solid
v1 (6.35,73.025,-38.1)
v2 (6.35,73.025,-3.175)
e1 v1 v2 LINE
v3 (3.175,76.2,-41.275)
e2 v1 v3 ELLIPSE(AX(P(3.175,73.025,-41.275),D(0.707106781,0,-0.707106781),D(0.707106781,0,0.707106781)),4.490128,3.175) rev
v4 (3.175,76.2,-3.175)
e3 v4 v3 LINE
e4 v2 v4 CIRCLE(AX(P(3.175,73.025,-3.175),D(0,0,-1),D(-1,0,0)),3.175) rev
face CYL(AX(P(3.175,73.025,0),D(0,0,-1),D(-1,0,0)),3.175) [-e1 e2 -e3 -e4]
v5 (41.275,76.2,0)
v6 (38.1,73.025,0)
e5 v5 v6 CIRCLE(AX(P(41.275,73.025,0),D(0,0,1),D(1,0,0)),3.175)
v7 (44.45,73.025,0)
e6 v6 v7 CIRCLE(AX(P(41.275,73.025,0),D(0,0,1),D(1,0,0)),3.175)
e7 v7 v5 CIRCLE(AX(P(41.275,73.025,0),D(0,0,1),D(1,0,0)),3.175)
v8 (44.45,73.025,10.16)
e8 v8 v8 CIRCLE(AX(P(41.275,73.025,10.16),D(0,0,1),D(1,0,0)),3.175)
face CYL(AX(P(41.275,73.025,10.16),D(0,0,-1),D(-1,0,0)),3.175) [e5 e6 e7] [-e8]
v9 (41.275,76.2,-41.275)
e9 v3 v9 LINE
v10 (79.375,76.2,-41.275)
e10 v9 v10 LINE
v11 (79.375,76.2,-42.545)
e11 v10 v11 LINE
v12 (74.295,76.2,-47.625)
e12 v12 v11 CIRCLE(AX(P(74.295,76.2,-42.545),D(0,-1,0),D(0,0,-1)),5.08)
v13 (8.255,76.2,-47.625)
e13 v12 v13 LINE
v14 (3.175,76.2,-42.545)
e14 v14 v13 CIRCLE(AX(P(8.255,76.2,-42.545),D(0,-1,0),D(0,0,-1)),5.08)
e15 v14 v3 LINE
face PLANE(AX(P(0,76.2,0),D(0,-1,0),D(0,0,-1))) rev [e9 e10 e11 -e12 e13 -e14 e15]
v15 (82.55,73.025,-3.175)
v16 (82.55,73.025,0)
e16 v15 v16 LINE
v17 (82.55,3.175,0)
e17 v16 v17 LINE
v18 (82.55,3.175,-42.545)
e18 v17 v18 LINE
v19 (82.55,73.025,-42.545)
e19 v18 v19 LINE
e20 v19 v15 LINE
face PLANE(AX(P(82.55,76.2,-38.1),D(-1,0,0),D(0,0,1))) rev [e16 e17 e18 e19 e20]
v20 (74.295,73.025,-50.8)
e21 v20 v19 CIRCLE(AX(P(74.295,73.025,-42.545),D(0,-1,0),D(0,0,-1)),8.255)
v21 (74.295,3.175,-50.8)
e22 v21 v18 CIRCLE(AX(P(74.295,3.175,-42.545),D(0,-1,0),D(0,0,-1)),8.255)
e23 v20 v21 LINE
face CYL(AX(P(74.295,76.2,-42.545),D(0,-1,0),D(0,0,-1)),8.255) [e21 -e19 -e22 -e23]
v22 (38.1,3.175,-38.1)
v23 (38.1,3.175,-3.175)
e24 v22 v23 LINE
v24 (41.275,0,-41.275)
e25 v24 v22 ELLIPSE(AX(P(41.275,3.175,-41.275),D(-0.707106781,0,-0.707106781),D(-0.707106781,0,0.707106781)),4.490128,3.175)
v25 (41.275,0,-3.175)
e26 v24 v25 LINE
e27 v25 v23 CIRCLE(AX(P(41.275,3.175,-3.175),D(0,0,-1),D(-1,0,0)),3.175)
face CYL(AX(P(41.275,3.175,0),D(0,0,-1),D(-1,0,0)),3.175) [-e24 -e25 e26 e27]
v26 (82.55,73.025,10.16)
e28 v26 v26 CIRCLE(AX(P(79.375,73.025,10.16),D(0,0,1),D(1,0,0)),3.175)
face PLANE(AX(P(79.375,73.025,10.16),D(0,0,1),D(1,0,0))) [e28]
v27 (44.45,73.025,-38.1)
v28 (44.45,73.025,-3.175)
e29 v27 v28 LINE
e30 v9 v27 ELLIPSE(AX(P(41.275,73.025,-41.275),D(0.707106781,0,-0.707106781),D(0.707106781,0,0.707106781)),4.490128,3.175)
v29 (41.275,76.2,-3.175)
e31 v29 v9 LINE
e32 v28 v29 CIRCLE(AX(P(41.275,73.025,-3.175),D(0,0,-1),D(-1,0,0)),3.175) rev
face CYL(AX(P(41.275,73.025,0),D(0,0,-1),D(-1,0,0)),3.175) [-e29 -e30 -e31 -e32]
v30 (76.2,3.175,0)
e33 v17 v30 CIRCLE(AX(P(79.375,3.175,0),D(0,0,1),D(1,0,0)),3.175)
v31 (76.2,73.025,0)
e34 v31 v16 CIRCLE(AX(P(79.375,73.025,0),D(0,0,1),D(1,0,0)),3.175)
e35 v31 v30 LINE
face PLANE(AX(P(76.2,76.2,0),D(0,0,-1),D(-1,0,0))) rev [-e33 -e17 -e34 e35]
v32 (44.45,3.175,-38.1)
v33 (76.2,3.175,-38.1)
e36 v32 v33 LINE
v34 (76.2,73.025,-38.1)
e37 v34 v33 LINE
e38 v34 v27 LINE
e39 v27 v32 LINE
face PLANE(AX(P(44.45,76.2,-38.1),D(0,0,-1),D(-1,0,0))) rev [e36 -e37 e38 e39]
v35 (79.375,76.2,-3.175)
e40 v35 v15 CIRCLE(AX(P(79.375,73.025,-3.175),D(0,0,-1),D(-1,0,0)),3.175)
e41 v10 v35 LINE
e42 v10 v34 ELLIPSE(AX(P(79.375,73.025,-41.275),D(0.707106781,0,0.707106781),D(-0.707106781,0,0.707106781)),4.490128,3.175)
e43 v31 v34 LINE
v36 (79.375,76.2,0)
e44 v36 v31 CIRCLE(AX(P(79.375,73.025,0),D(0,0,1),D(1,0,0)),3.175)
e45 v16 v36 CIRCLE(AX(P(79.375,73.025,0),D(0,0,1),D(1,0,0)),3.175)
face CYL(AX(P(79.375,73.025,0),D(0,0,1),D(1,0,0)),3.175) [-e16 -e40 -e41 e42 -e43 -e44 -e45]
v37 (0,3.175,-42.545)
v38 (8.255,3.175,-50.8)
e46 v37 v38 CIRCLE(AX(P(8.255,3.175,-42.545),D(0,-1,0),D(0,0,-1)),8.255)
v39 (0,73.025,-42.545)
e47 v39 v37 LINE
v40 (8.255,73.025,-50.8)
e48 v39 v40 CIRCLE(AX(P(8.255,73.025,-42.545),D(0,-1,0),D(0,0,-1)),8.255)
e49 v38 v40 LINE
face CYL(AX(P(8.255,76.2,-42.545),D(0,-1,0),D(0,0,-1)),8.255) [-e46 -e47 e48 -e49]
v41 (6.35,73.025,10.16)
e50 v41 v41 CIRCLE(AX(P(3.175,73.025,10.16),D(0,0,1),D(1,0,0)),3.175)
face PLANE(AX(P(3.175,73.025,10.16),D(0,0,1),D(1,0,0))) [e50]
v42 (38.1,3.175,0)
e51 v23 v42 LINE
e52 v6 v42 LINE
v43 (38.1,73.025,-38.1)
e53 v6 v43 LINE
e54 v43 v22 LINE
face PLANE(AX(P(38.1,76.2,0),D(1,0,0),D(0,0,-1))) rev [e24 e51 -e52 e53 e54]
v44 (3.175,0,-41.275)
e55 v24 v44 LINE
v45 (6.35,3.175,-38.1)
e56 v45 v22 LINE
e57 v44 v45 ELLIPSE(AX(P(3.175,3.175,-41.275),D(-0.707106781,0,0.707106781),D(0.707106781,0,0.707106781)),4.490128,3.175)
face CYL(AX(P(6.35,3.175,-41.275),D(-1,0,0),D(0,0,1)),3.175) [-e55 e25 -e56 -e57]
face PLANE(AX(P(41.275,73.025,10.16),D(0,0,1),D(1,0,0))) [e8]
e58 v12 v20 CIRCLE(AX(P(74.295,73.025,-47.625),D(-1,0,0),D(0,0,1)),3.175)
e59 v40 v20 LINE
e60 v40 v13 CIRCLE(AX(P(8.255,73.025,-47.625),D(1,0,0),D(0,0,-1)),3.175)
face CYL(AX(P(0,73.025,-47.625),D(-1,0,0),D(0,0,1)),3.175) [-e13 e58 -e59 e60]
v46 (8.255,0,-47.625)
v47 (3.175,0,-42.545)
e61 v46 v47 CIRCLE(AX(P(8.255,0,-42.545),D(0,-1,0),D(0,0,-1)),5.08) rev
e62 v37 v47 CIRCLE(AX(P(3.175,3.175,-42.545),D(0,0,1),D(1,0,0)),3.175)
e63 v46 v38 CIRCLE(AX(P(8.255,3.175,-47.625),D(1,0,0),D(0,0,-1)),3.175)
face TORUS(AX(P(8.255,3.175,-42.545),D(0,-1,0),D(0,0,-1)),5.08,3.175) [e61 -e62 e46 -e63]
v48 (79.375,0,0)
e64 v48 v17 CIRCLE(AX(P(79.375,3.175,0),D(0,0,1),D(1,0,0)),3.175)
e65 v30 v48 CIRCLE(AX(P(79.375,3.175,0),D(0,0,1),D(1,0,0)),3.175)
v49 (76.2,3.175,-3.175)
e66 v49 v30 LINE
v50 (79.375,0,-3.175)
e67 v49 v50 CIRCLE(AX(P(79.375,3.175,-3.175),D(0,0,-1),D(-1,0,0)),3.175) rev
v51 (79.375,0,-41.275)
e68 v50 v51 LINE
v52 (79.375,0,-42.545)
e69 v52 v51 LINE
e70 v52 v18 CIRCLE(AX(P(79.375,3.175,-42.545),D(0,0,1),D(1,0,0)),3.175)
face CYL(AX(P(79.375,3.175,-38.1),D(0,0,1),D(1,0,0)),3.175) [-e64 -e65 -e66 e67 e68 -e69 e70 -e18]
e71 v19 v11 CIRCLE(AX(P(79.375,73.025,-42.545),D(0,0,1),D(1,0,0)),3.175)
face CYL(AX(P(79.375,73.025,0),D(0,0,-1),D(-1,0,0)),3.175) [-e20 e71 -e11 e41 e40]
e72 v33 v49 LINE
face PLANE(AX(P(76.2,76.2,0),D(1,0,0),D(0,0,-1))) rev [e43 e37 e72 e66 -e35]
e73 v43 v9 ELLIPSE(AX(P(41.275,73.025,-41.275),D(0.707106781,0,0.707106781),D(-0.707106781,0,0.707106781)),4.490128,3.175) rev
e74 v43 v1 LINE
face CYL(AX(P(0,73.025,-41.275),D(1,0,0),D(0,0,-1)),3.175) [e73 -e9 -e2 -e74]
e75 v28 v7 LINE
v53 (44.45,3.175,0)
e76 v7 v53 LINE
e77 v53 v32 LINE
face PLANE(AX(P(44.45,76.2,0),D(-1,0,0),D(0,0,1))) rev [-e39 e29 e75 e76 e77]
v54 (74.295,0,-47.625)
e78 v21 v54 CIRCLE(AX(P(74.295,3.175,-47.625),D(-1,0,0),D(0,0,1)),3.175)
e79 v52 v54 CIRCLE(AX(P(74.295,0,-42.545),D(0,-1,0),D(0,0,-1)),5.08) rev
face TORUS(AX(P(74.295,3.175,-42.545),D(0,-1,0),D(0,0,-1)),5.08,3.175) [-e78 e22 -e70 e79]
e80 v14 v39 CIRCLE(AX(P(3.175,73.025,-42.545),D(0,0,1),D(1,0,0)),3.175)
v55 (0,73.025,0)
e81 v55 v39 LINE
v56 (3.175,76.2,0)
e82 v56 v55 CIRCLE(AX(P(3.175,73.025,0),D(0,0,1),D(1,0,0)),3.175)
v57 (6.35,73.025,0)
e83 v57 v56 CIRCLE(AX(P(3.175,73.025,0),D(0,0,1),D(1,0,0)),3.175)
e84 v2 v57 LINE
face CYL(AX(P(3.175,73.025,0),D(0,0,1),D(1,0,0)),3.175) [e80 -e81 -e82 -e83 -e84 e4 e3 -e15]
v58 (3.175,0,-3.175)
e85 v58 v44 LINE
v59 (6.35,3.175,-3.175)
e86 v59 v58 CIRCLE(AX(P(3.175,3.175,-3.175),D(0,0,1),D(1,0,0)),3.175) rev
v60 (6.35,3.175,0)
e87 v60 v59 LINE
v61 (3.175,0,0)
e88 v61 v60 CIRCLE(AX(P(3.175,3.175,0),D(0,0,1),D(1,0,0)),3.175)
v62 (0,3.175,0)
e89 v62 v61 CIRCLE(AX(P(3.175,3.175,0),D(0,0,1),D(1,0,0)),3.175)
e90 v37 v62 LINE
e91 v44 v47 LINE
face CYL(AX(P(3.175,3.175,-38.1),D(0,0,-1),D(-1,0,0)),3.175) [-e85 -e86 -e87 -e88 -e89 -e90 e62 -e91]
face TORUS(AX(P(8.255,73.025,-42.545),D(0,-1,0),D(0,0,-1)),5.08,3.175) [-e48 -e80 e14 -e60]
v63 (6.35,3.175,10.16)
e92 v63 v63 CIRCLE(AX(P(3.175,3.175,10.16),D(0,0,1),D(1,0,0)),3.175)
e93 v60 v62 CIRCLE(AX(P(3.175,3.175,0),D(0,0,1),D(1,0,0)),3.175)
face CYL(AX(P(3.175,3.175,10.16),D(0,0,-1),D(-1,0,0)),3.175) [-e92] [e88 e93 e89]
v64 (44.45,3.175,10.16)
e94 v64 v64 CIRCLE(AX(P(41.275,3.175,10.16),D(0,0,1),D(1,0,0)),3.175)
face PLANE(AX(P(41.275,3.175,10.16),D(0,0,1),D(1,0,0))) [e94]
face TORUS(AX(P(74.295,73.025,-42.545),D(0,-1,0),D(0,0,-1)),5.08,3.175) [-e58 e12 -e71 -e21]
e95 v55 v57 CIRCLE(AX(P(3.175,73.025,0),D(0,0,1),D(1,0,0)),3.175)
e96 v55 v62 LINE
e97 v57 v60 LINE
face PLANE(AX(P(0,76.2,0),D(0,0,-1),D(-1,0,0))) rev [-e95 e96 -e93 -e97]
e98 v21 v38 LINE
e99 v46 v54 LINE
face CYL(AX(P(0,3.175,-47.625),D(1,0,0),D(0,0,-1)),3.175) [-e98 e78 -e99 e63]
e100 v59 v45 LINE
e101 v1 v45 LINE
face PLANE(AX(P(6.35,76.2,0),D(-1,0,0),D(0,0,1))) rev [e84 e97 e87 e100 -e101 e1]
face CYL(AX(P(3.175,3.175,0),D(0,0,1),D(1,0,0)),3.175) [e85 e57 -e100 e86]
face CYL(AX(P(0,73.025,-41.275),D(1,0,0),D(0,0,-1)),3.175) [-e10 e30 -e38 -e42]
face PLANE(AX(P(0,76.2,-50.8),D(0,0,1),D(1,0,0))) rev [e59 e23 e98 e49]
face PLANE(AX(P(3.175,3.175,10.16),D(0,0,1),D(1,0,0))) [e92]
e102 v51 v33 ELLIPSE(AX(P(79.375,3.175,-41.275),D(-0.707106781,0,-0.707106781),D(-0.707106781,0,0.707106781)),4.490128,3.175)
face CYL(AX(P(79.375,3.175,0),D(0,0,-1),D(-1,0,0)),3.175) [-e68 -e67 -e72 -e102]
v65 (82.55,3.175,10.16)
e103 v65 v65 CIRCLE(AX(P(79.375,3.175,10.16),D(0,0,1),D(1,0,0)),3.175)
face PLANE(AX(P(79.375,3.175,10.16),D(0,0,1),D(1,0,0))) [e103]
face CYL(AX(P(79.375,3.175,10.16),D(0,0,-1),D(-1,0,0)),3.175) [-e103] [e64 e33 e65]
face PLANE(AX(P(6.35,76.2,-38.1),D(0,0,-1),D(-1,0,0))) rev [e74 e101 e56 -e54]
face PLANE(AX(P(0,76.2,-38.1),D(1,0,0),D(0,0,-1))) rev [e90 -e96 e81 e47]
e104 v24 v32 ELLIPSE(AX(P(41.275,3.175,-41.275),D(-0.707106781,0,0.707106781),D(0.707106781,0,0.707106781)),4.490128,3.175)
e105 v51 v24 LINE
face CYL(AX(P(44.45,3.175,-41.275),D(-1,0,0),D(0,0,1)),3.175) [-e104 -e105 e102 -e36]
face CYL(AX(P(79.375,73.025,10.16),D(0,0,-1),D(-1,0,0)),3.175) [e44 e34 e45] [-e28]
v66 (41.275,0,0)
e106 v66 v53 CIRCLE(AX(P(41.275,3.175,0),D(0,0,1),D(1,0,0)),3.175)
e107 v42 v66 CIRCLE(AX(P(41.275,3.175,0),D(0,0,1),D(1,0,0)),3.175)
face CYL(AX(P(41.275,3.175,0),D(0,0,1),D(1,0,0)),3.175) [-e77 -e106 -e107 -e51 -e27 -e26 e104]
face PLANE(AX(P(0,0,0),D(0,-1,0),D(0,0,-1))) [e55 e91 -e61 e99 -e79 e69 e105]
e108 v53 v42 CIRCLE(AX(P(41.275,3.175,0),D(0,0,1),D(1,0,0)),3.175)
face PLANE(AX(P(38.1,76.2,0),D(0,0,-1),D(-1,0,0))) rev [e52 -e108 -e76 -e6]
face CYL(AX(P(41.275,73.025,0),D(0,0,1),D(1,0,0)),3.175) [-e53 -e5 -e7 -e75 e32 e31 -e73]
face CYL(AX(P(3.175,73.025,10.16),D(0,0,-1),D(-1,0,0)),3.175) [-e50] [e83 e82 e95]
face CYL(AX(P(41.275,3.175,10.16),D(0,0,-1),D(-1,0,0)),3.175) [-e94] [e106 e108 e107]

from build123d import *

# Parameters (mm, degrees)
BOSS_EXTRUDE1_DEPTH = 76.2
SKETCH3_R           = 3.175
BOSS_EXTRUDE3_DEPTH = 10.16
FILLET2_R           = 3.175
FILLET3_R           = 8.255


# Some blends are built 0.0001 mm under size
with BuildPart() as part:
    # Sketch1 → Boss-Extrude1 (new body)
    with BuildSketch(Plane(origin=(0, 0, 0), x_dir=(1, 0, 0), z_dir=(0, 1, 0))):
        Polygon((44.45, 38.1), (76.2, 38.1), (76.2, 0), (82.55, 0), (82.55, 38.1), (82.55, 50.8), (0, 50.8), (0, 38.1), (0, 0), (6.35, 0), (6.35, 38.1), (38.1, 38.1), (38.1, 0), (44.45, 0), align=None)
    extrude(amount=BOSS_EXTRUDE1_DEPTH)

    # Sketch3 → Boss-Extrude3 (add)
    with BuildSketch(Plane.XY):
        with Locations((3.175, 73.025)):
            Circle(SKETCH3_R)
        with Locations((3.175, 3.175)):
            Circle(SKETCH3_R)
        with Locations((41.275, 3.175)):
            Circle(SKETCH3_R)
        with Locations((79.375, 3.175)):
            Circle(SKETCH3_R)
        with Locations((41.275, 73.025)):
            Circle(SKETCH3_R)
        with Locations((79.375, 73.025)):
            Circle(SKETCH3_R)
    extrude(amount=BOSS_EXTRUDE3_DEPTH)

    # Fillet2
    fillet2_edges = [part.edges().sort_by_distance(p)[0] for p in [
        (6.35, 0, -19.05),
        (22.225, 0, -38.1),
        (38.1, 0, -19.05),
        (44.45, 0, -19.05),
        (60.325, 0, -38.1),
        (76.2, 0, -19.05),
        (82.55, 0, -25.4),
        (41.275, 0, -50.8),
        (0, 0, -25.4),
        (41.275, 76.2, -50.8),
        (82.55, 76.2, -25.4),
        (76.2, 76.2, -19.05),
        (60.325, 76.2, -38.1),
        (44.45, 76.2, -19.05),
        (38.1, 76.2, -19.05),
        (22.225, 76.2, -38.1),
        (6.35, 76.2, -19.05),
        (0, 76.2, -25.4),
    ]]
    fillet(fillet2_edges, radius=FILLET2_R - 0.0001)  # a hair under: the kernel refuses the full size

    # Fillet3
    # the kernel refuses this fillet: 8.255 mm, written as the material it takes off along each edge
    with BuildSketch(Plane(origin=(74.295, 0, -42.545), x_dir=(0, 0, -1), z_dir=(-1, 0, 0))) as fillet3_piece_1:
        with BuildLine():
            CenterArc((5.0801, -3.1749), 3.1749, 0, 90)
            Line((8.255, -3.1749), (8.255, 0))
            Line((8.255, 0), (5.0801, 0))
        make_face()
    revolve(axis=Axis((74.295, 0, -42.545), (0, -1, 0)), revolution_arc=90, mode=Mode.SUBTRACT)
    with BuildSketch(Plane(origin=(8.255, 0, -42.545), x_dir=(-1, 0, 0), z_dir=(0, 0, 1))) as fillet3_piece_2:
        with BuildLine():
            CenterArc((5.0801, -3.1749), 3.1749, 0, 90)
            Line((8.255, -3.1749), (8.255, 0))
            Line((8.255, 0), (5.0801, 0))
        make_face()
    revolve(axis=Axis((8.255, 0, -42.545), (0, -1, 0)), revolution_arc=90, mode=Mode.SUBTRACT)
    with BuildSketch(Plane(origin=(74.295, 76.2, -42.545), x_dir=(1, 0, 0), z_dir=(0, 0, 1))) as fillet3_piece_3:
        with BuildLine():
            CenterArc((5.0801, -3.1749), 3.1749, 0, 90)
            Line((8.255, -3.1749), (8.255, 0))
            Line((8.255, 0), (5.0801, 0))
        make_face()
    revolve(axis=Axis((74.295, 76.2, -42.545), (0, 1, 0)), revolution_arc=90, mode=Mode.SUBTRACT)
    with BuildSketch(Plane(origin=(8.255, 76.2, -42.545), x_dir=(0, 0, -1), z_dir=(1, 0, 0))) as fillet3_piece_4:
        with BuildLine():
            CenterArc((5.0801, -3.1749), 3.1749, 0, 90)
            Line((8.255, -3.1749), (8.255, 0))
            Line((8.255, 0), (5.0801, 0))
        make_face()
    revolve(axis=Axis((8.255, 76.2, -42.545), (0, 1, 0)), revolution_arc=90, mode=Mode.SUBTRACT)
    with BuildSketch(Plane(origin=(0, 0, -50.8), x_dir=(1, 0, 0), z_dir=(0, 1, 0)), Plane(origin=(82.55, 0, -50.8), x_dir=(0, 0, 1), z_dir=(0, 1, 0))) as fillet3_piece_5:
        with BuildLine():
            CenterArc((FILLET3_R, -FILLET3_R), FILLET3_R, 90, 90)
            Line((0, -FILLET3_R), (0, 0))
            Line((0, 0), (FILLET3_R, 0))
        make_face()
    extrude(amount=76.2, mode=Mode.SUBTRACT)


solid = part.part
